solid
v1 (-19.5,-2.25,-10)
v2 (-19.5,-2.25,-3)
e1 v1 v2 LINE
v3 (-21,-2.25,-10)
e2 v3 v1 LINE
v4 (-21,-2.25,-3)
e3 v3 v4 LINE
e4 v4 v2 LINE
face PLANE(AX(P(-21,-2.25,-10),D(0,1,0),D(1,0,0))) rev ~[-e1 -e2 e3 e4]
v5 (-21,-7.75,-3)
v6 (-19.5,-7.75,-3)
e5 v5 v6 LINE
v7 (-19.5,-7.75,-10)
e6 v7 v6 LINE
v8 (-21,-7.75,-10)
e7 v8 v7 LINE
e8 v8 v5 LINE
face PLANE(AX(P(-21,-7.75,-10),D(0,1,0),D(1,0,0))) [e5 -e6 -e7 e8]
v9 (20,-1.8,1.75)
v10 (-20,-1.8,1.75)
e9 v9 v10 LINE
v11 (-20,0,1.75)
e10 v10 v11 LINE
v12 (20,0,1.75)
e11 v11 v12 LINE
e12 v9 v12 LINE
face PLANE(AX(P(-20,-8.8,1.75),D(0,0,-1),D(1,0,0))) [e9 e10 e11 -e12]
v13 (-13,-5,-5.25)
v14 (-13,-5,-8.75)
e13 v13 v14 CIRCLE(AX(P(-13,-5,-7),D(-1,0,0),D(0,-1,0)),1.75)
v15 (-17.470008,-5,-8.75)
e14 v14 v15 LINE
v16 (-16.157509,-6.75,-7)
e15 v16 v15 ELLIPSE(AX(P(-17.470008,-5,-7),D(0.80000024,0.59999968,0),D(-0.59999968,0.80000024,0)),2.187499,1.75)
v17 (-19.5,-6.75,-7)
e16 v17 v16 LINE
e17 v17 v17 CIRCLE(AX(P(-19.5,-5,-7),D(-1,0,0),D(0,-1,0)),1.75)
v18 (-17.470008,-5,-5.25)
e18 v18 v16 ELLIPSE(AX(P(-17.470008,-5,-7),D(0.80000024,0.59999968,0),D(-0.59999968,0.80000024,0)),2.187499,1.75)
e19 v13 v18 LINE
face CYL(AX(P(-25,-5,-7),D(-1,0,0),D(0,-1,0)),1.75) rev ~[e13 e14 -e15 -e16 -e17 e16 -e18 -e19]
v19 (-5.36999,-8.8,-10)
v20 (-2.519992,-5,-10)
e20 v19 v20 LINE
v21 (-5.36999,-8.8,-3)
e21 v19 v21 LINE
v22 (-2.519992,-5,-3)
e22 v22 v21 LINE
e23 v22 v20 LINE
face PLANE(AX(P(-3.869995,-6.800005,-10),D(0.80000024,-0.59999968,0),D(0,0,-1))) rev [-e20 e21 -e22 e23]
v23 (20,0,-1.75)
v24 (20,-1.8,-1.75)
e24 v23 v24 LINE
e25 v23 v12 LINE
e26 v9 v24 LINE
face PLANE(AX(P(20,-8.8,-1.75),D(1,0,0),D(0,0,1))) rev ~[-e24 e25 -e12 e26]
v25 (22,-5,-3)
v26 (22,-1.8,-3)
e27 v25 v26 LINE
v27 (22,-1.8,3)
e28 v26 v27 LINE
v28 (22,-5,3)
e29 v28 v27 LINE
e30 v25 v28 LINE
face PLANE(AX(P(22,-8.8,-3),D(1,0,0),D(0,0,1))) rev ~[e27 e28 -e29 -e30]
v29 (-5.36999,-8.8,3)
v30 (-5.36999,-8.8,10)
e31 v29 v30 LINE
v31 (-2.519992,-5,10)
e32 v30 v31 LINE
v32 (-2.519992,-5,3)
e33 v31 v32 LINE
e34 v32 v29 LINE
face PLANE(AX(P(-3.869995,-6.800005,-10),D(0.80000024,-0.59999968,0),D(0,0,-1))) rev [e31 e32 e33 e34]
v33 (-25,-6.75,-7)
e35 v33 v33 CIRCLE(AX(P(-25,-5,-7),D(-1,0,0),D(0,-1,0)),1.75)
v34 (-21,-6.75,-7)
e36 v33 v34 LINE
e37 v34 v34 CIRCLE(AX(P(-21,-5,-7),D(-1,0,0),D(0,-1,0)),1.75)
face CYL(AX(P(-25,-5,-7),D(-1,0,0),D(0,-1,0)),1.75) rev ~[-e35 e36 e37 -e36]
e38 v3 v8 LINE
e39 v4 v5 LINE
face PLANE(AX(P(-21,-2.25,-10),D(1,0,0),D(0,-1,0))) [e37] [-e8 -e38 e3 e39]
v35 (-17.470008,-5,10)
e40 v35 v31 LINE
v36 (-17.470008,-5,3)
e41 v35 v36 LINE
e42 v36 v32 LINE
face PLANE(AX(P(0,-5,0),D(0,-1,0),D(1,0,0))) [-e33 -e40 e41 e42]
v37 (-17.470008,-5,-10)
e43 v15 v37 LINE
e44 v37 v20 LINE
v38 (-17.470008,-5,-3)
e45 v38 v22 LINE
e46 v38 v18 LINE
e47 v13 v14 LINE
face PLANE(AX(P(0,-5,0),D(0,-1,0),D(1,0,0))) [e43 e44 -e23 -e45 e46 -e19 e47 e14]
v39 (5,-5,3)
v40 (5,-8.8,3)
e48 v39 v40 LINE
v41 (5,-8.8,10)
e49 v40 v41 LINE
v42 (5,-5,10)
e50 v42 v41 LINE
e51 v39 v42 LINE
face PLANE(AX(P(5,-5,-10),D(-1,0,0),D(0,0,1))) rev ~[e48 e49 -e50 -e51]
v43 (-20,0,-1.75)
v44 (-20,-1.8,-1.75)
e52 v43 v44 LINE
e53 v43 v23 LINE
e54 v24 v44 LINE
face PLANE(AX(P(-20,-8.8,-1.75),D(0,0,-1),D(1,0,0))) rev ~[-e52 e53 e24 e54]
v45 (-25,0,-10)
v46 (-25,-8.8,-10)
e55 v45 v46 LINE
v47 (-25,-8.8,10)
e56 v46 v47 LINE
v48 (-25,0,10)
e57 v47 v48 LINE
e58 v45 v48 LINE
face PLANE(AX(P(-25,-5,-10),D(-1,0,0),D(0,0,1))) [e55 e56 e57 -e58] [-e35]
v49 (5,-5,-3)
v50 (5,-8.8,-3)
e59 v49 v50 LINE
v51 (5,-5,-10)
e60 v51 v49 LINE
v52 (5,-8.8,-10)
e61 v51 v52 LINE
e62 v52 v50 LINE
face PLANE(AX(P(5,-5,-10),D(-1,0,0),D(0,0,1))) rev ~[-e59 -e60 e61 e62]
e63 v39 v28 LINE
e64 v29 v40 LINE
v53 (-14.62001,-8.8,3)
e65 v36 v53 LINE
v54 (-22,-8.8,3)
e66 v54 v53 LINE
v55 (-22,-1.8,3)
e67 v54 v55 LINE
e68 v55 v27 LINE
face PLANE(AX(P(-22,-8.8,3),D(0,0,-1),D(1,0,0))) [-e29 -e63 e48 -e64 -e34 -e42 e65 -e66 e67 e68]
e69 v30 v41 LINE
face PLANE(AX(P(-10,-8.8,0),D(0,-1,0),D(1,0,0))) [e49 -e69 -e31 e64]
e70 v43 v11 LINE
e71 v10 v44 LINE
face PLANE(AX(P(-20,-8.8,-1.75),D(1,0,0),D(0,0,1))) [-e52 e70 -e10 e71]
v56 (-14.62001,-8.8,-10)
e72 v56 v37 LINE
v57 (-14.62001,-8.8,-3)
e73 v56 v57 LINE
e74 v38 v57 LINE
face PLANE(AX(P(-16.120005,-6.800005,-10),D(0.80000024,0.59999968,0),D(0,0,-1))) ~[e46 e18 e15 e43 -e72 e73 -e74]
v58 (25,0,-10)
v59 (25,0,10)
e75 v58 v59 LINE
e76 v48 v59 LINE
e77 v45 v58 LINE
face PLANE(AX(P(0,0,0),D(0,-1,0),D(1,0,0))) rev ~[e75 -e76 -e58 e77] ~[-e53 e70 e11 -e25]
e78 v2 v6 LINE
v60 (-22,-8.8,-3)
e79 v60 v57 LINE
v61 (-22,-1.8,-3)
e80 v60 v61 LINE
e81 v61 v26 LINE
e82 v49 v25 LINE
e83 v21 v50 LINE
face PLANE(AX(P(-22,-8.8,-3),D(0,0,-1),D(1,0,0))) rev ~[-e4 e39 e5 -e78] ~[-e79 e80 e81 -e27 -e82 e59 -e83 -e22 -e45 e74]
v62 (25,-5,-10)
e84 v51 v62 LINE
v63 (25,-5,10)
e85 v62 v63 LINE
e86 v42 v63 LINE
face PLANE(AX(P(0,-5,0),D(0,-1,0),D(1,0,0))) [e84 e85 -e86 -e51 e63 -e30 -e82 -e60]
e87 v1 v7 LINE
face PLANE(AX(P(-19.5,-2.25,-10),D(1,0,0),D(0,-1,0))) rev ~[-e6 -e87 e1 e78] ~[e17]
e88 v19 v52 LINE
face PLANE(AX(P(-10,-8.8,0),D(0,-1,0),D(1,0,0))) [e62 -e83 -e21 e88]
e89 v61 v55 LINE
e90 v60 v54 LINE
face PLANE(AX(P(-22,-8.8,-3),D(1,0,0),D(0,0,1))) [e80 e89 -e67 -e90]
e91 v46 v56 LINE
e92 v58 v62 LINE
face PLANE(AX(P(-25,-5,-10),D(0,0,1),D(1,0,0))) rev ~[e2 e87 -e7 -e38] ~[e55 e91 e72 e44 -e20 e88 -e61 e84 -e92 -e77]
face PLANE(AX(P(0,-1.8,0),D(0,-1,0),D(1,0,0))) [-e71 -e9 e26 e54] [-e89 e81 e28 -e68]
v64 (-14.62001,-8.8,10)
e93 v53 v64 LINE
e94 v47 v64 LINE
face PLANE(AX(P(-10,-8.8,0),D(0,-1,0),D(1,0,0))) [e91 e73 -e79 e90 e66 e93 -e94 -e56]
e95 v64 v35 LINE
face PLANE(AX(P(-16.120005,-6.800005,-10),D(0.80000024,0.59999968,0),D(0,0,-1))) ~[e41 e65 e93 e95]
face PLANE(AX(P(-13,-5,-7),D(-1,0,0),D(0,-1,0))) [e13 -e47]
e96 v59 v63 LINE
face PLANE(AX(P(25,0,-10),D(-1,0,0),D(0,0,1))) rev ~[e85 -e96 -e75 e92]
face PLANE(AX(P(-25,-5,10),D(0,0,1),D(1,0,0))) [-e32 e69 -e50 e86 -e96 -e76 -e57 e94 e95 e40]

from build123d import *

# Parameters (mm, degrees)
F0_W      = 50
F0_H      = 20
F1_DEPTH  = 5
F2_W      = 30
F2_H      = 20
F3_DEPTH  = 3.8
F4_W      = 15.25
F4_H      = 20
F5_DEPTH  = 4
F6_SIZE2  = 3.99999
F6_SIZE   = 2.99999
F9_W      = 40
F9_H      = 3.5
F10_DEPTH = 12.5
F11_W     = 44
F11_H     = 6
F12_DEPTH = 7
F13_R     = 1.75
F14_DEPTH = 12
F15_W     = 1.5
F15_H     = 5.5
F16_DEPTH = 8


# Not quite as in the source:
# - a fillet or chamfer is up to 0.001 mm smaller than in the source, because OpenCascade refuses the exact size


with BuildPart() as f1:
    # F0 (on Front) → F1 (new body)
    with BuildSketch(Plane.XZ):
        Rectangle(F0_W, F0_H)
    extrude(amount=F1_DEPTH)


with BuildPart() as f3:
    # F2 (on face) → F3 (new body)
    with BuildSketch(Plane.XZ.offset(5)):
        with Locations((-10, 0)):
            Rectangle(F2_W, F2_H)
    extrude(amount=F3_DEPTH)


with BuildPart() as f5:
    # F4 (on face) → F5 (new body)
    with BuildSketch(Plane.XZ.offset(8.8)):
        with Locations((-9.995, 0)):
            Rectangle(F4_W, F4_H)
    extrude(amount=-F5_DEPTH)

    # F6 (size 3 and 4 in the source; OpenCascade refuses exactly that, so slightly less here)
    f6_edges = [f5.edges().sort_by_distance(p)[0] for p in [
        (-2.37, -8.8, 0),
        (-17.62, -8.8, 0),
    ]]
    f6_side = f5.faces().sort_by_distance((-9.995, -8.8, 0))[0]
    chamfer(f6_edges, length=F6_SIZE, length2=F6_SIZE2, reference=f6_side)


with BuildPart() as f3_1:
    add(f3.part)

    # F7: cut F5
    add(f5.part, mode=Mode.SUBTRACT)


with BuildPart() as f1_1:
    add(f1.part)

    # F8: union F3
    add(f3_1.part)

    # F9 (on face) → F10 (cut, symmetric)
    with BuildSketch(Plane.XZ.offset(8.8)):
        Rectangle(F9_W, F9_H)
    extrude(amount=F10_DEPTH, both=True, mode=Mode.SUBTRACT)

    # F11 (on face) → F12 (cut)
    with BuildSketch(Plane.XZ.offset(8.8)):
        Rectangle(F11_W, F11_H)
    extrude(amount=-F12_DEPTH, mode=Mode.SUBTRACT)

    # F13 (on face) → F14 (cut)
    with BuildSketch(Plane(origin=(-25, 0, 0), x_dir=(0, -1, 0), z_dir=(-1, 0, 0))):
        with Locations((5, -7)):
            Circle(F13_R)
    extrude(amount=-F14_DEPTH, mode=Mode.SUBTRACT)

    # F15 (on face) → F16 (cut)
    with BuildSketch(Plane(origin=(0, 0, -10), x_dir=(1, 0, 0), z_dir=(0, 0, -1))):
        with Locations((-20.25, 5)):
            Rectangle(F15_W, F15_H)
    extrude(amount=-F16_DEPTH, mode=Mode.SUBTRACT)


solid = f1_1.part
